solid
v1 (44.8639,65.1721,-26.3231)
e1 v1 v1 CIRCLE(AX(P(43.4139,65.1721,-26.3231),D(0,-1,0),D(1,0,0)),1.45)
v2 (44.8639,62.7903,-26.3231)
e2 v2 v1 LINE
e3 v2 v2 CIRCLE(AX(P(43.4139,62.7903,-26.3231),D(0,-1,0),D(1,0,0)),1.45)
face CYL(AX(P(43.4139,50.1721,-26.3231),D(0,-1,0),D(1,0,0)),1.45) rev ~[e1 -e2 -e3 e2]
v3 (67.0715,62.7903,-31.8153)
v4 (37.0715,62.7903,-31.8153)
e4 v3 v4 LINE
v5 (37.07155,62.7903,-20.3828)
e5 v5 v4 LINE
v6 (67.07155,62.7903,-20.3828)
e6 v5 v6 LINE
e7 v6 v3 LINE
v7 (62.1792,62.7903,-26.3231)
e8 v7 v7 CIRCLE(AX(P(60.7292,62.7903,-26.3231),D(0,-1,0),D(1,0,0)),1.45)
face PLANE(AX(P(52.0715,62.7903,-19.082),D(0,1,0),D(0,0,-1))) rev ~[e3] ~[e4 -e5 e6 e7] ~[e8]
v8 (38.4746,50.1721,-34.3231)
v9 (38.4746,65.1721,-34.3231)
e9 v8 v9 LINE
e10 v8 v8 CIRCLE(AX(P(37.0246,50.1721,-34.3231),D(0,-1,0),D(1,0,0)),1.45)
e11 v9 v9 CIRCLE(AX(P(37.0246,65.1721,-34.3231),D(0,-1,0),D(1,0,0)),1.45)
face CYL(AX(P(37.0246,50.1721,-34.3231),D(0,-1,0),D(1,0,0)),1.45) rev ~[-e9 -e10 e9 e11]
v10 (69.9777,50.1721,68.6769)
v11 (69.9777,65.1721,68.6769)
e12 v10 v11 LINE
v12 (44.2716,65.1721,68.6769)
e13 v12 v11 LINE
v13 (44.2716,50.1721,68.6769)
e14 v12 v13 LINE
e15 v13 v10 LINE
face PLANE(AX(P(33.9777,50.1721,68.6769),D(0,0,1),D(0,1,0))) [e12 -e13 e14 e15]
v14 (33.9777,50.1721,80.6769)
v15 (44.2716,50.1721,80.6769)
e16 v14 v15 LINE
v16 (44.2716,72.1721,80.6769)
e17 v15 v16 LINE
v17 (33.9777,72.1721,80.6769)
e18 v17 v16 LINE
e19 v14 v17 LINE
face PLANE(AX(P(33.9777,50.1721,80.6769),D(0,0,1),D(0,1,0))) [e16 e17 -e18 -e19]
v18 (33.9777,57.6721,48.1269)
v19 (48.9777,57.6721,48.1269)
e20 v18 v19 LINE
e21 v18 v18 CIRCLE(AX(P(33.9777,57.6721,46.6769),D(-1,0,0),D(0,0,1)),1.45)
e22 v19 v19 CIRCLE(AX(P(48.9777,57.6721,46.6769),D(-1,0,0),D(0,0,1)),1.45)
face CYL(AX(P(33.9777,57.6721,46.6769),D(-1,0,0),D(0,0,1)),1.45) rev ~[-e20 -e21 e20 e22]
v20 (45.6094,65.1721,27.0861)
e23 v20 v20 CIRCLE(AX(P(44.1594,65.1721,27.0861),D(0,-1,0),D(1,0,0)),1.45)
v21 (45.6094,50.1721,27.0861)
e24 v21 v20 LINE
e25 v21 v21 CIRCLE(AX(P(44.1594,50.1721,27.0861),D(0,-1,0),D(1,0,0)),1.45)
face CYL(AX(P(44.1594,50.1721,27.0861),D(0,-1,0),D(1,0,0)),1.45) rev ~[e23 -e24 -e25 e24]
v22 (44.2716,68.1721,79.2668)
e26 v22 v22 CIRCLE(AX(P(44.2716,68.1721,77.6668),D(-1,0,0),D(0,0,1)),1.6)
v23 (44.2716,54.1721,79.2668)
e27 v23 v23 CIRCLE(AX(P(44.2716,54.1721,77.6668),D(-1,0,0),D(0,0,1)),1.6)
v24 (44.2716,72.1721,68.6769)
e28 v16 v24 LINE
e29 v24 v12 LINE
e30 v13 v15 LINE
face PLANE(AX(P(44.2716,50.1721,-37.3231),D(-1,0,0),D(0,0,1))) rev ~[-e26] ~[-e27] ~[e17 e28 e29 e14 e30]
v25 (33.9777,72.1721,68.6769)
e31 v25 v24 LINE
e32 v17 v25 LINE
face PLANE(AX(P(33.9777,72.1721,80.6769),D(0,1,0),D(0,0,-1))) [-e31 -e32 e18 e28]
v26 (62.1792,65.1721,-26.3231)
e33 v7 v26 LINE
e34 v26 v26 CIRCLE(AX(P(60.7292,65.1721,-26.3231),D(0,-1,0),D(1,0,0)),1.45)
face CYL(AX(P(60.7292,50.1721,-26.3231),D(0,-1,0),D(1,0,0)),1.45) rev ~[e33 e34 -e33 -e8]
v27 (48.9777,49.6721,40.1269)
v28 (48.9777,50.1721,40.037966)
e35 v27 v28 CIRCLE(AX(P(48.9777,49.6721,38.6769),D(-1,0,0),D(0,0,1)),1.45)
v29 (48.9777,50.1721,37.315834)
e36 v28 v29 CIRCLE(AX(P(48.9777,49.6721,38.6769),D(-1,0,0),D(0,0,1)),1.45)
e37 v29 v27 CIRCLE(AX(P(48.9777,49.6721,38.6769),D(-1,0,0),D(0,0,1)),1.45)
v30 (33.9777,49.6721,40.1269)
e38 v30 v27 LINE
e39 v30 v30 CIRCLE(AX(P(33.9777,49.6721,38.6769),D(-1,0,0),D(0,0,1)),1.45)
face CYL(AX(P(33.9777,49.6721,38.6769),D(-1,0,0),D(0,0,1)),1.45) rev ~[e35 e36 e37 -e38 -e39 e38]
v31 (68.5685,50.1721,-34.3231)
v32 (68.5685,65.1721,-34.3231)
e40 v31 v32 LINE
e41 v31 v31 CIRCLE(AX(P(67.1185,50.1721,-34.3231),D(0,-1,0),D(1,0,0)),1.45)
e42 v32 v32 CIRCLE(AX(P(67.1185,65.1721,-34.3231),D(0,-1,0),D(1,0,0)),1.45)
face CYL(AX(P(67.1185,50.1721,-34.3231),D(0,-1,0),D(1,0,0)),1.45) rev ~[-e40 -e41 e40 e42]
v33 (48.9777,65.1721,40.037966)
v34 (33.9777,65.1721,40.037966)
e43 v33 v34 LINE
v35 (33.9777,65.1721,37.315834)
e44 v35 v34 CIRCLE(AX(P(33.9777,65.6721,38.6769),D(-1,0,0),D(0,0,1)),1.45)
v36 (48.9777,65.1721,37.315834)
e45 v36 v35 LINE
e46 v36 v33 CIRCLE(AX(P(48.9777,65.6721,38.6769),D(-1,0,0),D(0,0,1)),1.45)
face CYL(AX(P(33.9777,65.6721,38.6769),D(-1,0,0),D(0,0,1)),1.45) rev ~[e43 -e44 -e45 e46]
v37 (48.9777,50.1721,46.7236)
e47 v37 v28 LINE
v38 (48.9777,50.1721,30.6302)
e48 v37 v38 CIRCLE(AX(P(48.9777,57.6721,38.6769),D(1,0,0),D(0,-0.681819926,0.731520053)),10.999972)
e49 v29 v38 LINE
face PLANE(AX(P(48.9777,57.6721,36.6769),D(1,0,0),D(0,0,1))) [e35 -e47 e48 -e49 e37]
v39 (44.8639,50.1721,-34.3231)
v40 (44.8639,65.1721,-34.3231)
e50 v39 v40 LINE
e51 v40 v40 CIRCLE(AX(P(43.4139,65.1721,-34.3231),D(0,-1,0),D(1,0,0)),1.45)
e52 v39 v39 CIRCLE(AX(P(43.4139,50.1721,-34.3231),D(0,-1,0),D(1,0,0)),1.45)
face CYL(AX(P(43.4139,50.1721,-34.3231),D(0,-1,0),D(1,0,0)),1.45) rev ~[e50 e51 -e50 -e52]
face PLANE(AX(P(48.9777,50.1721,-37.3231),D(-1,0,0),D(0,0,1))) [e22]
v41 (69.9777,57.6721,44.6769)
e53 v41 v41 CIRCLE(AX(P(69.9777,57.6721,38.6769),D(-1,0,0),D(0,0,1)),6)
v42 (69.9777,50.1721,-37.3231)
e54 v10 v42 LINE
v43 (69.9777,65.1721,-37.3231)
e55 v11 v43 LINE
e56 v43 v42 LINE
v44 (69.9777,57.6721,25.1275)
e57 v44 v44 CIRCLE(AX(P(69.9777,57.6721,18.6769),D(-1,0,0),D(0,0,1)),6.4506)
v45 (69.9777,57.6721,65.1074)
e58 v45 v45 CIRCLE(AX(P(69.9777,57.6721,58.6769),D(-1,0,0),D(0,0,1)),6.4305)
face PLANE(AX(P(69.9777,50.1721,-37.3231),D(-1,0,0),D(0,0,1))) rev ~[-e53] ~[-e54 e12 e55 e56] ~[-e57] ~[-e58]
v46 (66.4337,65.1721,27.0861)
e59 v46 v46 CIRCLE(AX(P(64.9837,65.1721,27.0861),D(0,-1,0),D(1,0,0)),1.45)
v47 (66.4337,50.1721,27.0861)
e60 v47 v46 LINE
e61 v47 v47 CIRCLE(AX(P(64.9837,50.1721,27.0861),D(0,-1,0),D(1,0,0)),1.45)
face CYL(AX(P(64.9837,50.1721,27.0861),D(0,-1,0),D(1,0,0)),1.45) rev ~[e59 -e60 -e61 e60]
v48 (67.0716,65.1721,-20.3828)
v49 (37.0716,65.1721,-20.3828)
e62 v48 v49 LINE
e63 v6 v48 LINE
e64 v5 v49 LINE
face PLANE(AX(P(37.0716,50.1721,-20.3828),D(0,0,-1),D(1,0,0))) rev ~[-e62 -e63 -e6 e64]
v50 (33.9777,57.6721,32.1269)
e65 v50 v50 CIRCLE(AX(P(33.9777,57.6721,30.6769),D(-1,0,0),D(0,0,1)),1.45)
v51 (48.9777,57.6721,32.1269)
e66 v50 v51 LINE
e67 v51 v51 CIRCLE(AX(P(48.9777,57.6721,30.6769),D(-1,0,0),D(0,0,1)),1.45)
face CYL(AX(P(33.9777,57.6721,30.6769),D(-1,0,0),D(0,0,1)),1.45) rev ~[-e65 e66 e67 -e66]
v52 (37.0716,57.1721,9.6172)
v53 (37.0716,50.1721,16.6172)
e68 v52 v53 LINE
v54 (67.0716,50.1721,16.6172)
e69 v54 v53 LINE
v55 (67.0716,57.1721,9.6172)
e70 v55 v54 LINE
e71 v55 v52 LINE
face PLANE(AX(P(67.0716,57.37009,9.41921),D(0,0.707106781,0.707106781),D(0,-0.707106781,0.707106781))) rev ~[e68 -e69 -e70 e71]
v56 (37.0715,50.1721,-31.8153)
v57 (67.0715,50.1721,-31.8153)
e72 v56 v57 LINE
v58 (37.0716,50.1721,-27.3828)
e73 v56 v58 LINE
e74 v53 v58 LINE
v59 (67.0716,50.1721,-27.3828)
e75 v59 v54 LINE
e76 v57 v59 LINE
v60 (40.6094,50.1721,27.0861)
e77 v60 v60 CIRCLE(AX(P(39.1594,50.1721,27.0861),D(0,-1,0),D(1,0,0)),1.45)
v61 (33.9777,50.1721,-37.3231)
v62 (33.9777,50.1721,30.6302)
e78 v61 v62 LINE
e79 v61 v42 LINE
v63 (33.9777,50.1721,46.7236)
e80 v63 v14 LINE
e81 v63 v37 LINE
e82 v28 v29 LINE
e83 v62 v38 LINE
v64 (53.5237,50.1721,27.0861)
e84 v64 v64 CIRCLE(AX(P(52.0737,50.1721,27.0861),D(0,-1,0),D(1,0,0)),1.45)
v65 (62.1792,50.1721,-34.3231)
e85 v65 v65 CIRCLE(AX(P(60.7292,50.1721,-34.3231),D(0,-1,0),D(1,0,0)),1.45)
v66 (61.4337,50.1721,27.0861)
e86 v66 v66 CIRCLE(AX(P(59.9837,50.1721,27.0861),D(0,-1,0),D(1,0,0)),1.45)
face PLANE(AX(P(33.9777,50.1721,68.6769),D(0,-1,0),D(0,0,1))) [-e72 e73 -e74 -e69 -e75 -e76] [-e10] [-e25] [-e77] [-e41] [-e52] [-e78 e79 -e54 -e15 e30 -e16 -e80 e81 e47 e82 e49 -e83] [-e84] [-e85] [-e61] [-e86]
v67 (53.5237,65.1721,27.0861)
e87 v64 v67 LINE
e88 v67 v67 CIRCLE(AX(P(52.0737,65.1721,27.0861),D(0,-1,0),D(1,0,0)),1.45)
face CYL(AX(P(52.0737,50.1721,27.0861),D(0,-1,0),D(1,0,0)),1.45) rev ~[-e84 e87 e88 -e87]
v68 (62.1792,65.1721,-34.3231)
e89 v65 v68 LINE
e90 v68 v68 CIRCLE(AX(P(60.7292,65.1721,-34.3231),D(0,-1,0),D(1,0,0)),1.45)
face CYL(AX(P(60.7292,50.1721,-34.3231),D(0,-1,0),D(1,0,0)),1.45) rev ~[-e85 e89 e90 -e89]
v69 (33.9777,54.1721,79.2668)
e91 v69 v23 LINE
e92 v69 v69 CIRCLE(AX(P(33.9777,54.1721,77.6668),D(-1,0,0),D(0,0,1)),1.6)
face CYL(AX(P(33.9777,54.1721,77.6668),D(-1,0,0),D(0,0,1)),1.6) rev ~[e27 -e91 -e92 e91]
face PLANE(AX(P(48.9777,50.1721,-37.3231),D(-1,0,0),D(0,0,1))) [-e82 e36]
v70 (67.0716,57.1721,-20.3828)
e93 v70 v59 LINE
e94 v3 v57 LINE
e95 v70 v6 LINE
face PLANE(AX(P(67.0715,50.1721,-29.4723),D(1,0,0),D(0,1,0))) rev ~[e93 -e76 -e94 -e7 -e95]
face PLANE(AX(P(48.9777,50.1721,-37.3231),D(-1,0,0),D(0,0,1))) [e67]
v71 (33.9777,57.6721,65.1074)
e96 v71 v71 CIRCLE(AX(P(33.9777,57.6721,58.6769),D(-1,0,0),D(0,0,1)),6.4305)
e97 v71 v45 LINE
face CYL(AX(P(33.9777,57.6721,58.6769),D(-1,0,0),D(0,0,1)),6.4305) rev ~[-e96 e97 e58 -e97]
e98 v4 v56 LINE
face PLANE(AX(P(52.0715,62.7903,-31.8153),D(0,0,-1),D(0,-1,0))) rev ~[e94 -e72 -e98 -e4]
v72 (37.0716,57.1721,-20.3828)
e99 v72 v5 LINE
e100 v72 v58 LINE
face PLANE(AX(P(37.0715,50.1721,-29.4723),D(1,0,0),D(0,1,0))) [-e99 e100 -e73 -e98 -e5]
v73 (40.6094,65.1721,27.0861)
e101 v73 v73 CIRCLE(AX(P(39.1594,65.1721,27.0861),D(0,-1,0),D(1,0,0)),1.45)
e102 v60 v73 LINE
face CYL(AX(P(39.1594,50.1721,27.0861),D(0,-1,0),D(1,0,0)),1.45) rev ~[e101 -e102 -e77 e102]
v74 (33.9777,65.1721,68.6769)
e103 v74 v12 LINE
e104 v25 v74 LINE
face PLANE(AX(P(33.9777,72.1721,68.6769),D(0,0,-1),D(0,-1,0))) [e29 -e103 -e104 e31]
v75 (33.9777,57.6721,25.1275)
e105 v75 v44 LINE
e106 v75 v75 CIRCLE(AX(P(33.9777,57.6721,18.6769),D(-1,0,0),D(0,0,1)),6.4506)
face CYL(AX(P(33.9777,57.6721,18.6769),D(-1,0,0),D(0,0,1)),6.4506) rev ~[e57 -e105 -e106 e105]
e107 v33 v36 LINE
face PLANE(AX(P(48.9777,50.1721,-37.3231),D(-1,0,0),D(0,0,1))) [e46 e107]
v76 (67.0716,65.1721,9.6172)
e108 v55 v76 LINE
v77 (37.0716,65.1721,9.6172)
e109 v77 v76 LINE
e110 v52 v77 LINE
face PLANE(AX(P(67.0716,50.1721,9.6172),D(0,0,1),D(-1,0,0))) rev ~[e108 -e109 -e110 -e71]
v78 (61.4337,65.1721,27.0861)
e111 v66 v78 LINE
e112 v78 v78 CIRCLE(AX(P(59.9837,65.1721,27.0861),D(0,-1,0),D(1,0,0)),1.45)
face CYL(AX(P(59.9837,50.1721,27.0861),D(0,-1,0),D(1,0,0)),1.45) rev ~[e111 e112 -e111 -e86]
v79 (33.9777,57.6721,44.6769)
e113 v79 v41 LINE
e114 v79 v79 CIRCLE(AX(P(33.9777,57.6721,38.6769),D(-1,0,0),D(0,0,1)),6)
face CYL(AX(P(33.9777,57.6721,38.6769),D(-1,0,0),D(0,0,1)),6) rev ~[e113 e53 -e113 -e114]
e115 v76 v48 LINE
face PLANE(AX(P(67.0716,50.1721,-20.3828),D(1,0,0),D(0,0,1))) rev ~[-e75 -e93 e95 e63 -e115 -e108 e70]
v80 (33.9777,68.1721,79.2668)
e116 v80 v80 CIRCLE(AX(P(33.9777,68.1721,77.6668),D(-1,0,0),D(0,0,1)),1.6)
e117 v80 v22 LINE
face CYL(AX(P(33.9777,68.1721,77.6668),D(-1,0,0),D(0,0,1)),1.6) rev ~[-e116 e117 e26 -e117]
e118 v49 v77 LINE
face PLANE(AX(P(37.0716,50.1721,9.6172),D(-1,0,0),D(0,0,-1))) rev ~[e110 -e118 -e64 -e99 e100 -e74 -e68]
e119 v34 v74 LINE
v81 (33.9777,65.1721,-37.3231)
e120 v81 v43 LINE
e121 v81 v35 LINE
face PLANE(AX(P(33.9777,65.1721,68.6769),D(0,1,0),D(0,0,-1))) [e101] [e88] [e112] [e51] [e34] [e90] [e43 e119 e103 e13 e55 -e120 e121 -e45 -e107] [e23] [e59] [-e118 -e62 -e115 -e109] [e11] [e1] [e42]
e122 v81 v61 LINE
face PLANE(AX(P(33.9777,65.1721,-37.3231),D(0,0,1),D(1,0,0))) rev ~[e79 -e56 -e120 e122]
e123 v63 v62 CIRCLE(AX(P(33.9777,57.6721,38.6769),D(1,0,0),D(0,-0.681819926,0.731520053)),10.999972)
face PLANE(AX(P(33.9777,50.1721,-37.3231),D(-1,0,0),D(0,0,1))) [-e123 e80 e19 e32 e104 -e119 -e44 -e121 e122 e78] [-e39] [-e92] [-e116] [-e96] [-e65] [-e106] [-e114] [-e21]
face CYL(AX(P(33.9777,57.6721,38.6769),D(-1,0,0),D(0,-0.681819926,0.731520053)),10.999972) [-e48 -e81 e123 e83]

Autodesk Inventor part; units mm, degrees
ref_plane "YZ Plane" through (0, 0, 0) normal (1, 0, 0) x (0, 1, 0)
ref_plane "Work Plane1" through (49.1675, 65.1721, -19.9847) normal (0, 1, 0) x (-1, 0, 0)
sketch "Sketch1" plane through (49.1675, 65.1721, -19.9847) normal (0, 1, 0) x (-1, 0, 0)
  circle A0 centre (-2.8102, 4.1616) radius 0.75 construction
  circle A1 centre (-2.8102, 25.1616) radius 0.75 construction
  line L0 (11.6898, 12.5705) -> (11.6898, 16.7526) construction
  arc A2 (11.6898, 16.7526) -> (11.6898, 12.5705) centre (-2.8102, 14.6616) ccw construction
  arc A3 (6.4943, 19.8433) -> (3.1979, 23.455) centre (-2.8102, 14.6616) ccw construction
  arc A4 (3.1979, 5.8681) -> (6.3691, 9.2612) centre (-2.8102, 14.6616) ccw construction
  line L1 (6.4943, 19.8433) -> (10.0762, 19.8433) construction
  line L2 (10.0762, 19.8433) -> (10.0762, 9.2612) construction
  line L3 (10.0762, 9.2612) -> (6.3691, 9.2612) construction
  arc A5 (-8.8183, 23.455) -> (-8.8183, 5.8681) centre (-2.8102, 14.6616) ccw construction
  line L4 (15.1898, -17.3384) -> (-20.8102, -17.3384)
  line L5 (-20.8102, -17.3384) -> (-20.8102, 14.6616)
  line L6 (-20.8102, 14.6616) -> (15.1898, 14.6616)
  line L7 (15.1898, 14.6616) -> (15.1898, -17.3384)
  arc A6 (4.8861, 27.3616) -> (3.5031, 1.2204) centre (-2.8102, 14.6616) ccw construction
  line L8 (4.8861, 27.3616) -> (11.8898, 27.3616) construction
  line L9 (11.8898, 27.3616) -> (11.8898, 1.9616) construction
  line L10 (11.8898, 1.9616) -> (4.7096, 1.9616) construction
  line L11 (4.7096, 1.9616) -> (2.6908, 5.7766) construction
  arc A7 (2.6908, 5.7766) -> (6.254, 9.4612) centre (-2.8102, 14.6616) ccw construction
  line L12 (6.254, 9.4612) -> (9.8762, 9.4612) construction
  line L13 (9.8762, 9.4612) -> (9.8762, 19.6433) construction
  line L14 (9.8762, 19.6433) -> (6.376, 19.6433) construction
  arc A8 (6.376, 19.6433) -> (3.2687, 23.1616) centre (-2.8102, 14.6616) ccw construction
  line L15 (3.2687, 23.1616) -> (-8.889, 23.1616) construction
  arc A9 (-8.889, 23.1616) -> (-8.446, 5.8616) centre (-2.8102, 14.6616) ccw construction
  line L16 (-8.446, 5.8616) -> (1.0472, 5.8616) construction
  line L17 (1.0472, 5.8616) -> (3.5031, 1.2204) construction
  arc A10 (-17.6602, 14.6616) -> (4.7096, 1.9616) centre (-2.9041, 14.6019) ccw
  line L18 (4.7096, 1.9616) -> (11.8943, 1.9616)
  line L19 (11.8943, 1.9616) -> (11.8898, 14.6616)
  line L20 (11.8898, 14.6616) -> (15.1898, 14.6616)
  line L21 (3.1979, 5.8681) -> (-8.8183, 5.8681) projected
  line L22 (3.1979, 23.455) -> (-8.8183, 23.455) projected
  point P0 (49.1675, 19.9847)
  dimension "d0" = 32
  dimension "d2" = 18
  dimension "d3" = 18
  dimension "d4" = 0.2
extrude "Extrusion1" add sketch "Sketch1" against normal blind 15 contours L4 L5 L6 A10 L18 L19 L7
mirror "Mirror1" about plane through (37.2777, 65.1721, -5.3231) normal (0, 0, 1) of "Extrusion1"
sketch "Sketch4" plane through (33.9777, 50.1721, -37.3231) normal (-1, 0, 0) x (0, 0, 1)
  line L0 (0, 15) -> (64, 15) projected
  line L1 (0, 15) -> (0, 0) projected
  line L2 (0, 0) -> (64, 0) projected
  line L3 (64, 15) -> (64, 0) projected
  line L4 (0, 15) -> (64, 15) projected
  line L5 (64, 15) -> (88, 15)
  line L6 (88, 15) -> (88, 0)
  line L7 (88, 0) -> (64, 0)
  line L8 (64, 0) -> (64, 15)
  circle A0 centre (56, 7.5) radius 3 projected
  circle A1 centre (56, 7.5) radius 5 projected
  circle A2 centre (76, 7.5) radius 6
  point P0 (37.3231, -50.1721)
  dimension "d20" = 24
  dimension "d21" = 12
  dimension "d24" = 12
extrude "Extrusion4" add sketch "Sketch4" against normal up to surface (36 mm away) contours L5 L6 L7 L3
ref_plane "Work Plane4" through (33.9777, 57.6721, 36.6769) normal (1, 0, 0) x (0, 0, 1)
sketch "Sketch6" plane through (33.9777, 57.6721, 36.6769) normal (1, 0, 0) x (0, 0, 1)
  circle A0 centre (10, 0) radius 1.625 construction
  circle A1 centre (2, -8) radius 1.625 projected
  circle A2 centre (-6, 0) radius 1.625 construction
  circle A3 centre (2, 8) radius 1.625 projected
  circle A4 centre (2, 0) radius 4 projected
  circle A5 centre (2, 0) radius 11 construction
  line L0 (14, 7.5) -> (-74, 7.5) projected
  arc A6 (10.0467, 7.5) -> (-6.0467, 7.5) centre (2, 0) ccw
  point P0 (-36.6769, 57.6721)
extrude "Extrusion6" add sketch "Sketch6" along normal blind 15 contours A3 L0 | A3 L0 A6 | L0 A3
sketch "Sketch5" plane through (33.9777, 50.1721, -37.3231) normal (-1, 0, 0) x (0, 0, 1)
  circle A0 centre (68, 7.5) radius 1.625 projected
  circle A1 centre (84, 7.5) radius 1.625 projected
  circle A2 centre (84, 7.5) radius 1.45
  circle A3 centre (68, 7.5) radius 1.45
  circle A4 centre (76, 15.5) radius 1.625 projected
  circle A5 centre (76, -0.5) radius 1.625 projected
  circle A6 centre (76, -0.5) radius 1.45
  circle A7 centre (76, 15.5) radius 1.45
  point P0 (37.3231, -50.1721)
  dimension "d25" = 2.9
  dimension "d26" = 2.9
  dimension "d31" = 2.9
  dimension "d32" = 2.9
extrude "Extrusion5" cut sketch "Sketch5" against normal blind 15 contours A2 | A3 | A6 | A7
sketch "Sketch7" plane through (33.9777, 50.1721, -37.3231) normal (-1, 0, 0) x (0, 0, 1)
  arc A0 (74.6389, 15) -> (77.3611, 15) centre (76, 15.5) ccw projected
  line L0 (0, 15) -> (74.6389, 15) projected
  line L1 (0, 15) -> (0, 0) projected
  line L2 (67.9533, 0) -> (0, 0) projected
  arc A1 (67.9533, 0) -> (84.0467, 0) centre (76, 7.5) ccw projected
  line L3 (88, 0) -> (84.0467, 0) projected
  line L4 (88, 15) -> (88, 0) projected
  line L5 (77.3611, 15) -> (88, 15) projected
  circle A2 centre (68, 7.5) radius 1.45 projected
  circle A3 centre (84, 7.5) radius 1.45 projected
  circle A4 centre (76, -0.5) radius 1.45 projected
  circle A5 centre (76, 7.5) radius 6 projected
  line L6 (0, 0) -> (88, 0) projected
  line L7 (88, 0) -> (106, 0)
  line L8 (106, 0) -> (106, 15)
  line L9 (106, 15) -> (88, 15)
  line L10 (88, 15) -> (88, 0)
  circle A6 centre (96, 7.5) radius 6.4305
  circle A7 centre (56, 7.5) radius 6.4532
  point P0 (37.3231, -50.1721)
  dimension "d34" = 20
  dimension "d35" = 10
  dimension "d40" = 20
extrude "Extrusion7" add sketch "Sketch7" against normal up to surface (36 mm away) contours L9 L8 L7 L4
sketch "Sketch9" plane through (33.9777, 50.1721, -37.3231) normal (-1, 0, 0) x (0, 0, 1)
  circle A0 centre (96, 7.5) radius 6.4305 projected
  circle A1 centre (56, 7.5) radius 6.4506
  point P0 (37.3231, -50.1721)
  dimension "d41" = 40
extrude "Extrusion9" cut sketch "Sketch9" against normal through all contours A1
sketch "Sketch10" plane through (33.9777, 50.1721, 68.6769) normal (0, 0, 1) x (1, 0, 0)
  circle A0 centre (18.104, 4) radius 1.4
  circle A1 centre (18.104, 18) radius 1.4
  point P0 (-33.9777, -50.1721)
sketch "Sketch11" plane through (33.9777, 50.1721, -37.3231) normal (-1, 0, 0) x (0, 0, 1)
  circle A0 centre (114.9899, 4) radius 1.4
  circle A1 centre (114.9899, 18) radius 1.4
  line L0 (106, 15) -> (106, 0) projected
  line L1 (106, 0) -> (118, 0)
  line L2 (118, 0) -> (118, 22)
  line L3 (118, 22) -> (106, 22)
  line L4 (106, 22) -> (106, 0)
  circle A2 centre (114.9899, 4) radius 1.6
  circle A3 centre (114.9899, 18) radius 1.6
  point P0 (37.3231, -50.1721)
  dimension "d44" = 12
  dimension "d45" = 22
  dimension "d46" = 3.2
  dimension "d47" = 3.2
ref_plane "Work Plane5" through (44.2715, 46.1721, 69.8769) normal (-1, 0, 0) x (0, 0, 1)
extrude "Extrusion10" add sketch "Sketch11" against normal up to surface (10.2939 mm away) contours L4 L3 L2 L1 L0
sketch "Sketch12" plane through (49.1675, 50.1721, -19.9847) normal (0, -1, 0) x (1, 0, 0)
  circle A0 centre (-12.1429, -14.3384) radius 1.45
  circle A1 centre (-5.7536, -14.3384) radius 1.45
  circle A2 centre (-5.7536, -6.3384) radius 1.45
  circle A3 centre (11.5617, -14.3384) radius 1.45
  circle A4 centre (11.5617, -6.3384) radius 1.45
  circle A5 centre (17.951, -14.3384) radius 1.45
  circle A6 centre (10.8162, 47.0708) radius 1.45
  circle A7 centre (-5.0081, 47.0708) radius 1.45
  circle A8 centre (-10.0081, 47.0708) radius 1.45
  circle A9 centre (15.8162, 47.0708) radius 1.45
  circle A10 centre (2.9062, 47.0708) radius 1.45
  point P0 (-49.1675, 19.9847)
  dimension "d61" = 2.9
  dimension "d62" = 2.9
  dimension "d63" = 5
  dimension "d64" = 5
  dimension "d65" = 7.91
extrude "Extrusion11" cut sketch "Sketch12" against normal through all
sketch "Sketch13" plane through (49.1675, 50.1721, -19.9847) normal (0, -1, 0) x (1, 0, 0)
  arc A0 (-4.7096, 1.9616) -> (17.6602, 14.6616) centre (2.9041, 14.6019) ccw projected
  line L0 (-12.0959, -0.3981) -> (17.9041, -0.3981)
  line L1 (17.9041, -0.3981) -> (17.9041, 29.6019)
  line L2 (17.9041, 29.6019) -> (-12.0959, 29.6019)
  line L3 (-12.0959, 29.6019) -> (-12.0959, -0.3981)
  line L4 (-12.0959, -0.3981) -> (17.9041, 29.6019) construction
  line L5 (17.9041, -0.3981) -> (-12.0959, 29.6019) construction
  point P0 (-49.1675, 19.9847)
  dimension "d52" = 30
  dimension "d53" = 30
extrude "Extrusion12" cut sketch "Sketch13" against normal through all
chamfer "Chamfer1" distance 7 angle 45 2 edges at (52.0715, 50.1721, 9.6173) (52.0715, 50.1721, -20.3827)
ref_plane "Work Plane6" through (52.0715, 50.1721, -29.4723) normal (1, 0, 0) x (0, 1, 0)
sketch "Sketch14" plane through (52.0715, 50.1721, -29.4723) normal (1, 0, 0) x (0, 1, 0)
  line L0 (-2.0896, 10.3903) -> (12.6182, 10.3903)
  line L1 (12.6182, 10.3903) -> (12.6182, -2.343)
  line L2 (12.6182, -2.343) -> (-2.0896, -2.343)
  line L3 (-2.0896, -2.343) -> (-2.0896, 10.3903)
  point P0 (-50.1721, 29.4723)
ref_plane "Work Plane7" through (57.0715, 40.1721, -25.6076) normal (-1, 0, 0) x (0, 0, 1)
extrude "Extrusion14" cut sketch "Sketch14" along normal mid plane 30
properties part number "01_Slide_camera_x_v0"
